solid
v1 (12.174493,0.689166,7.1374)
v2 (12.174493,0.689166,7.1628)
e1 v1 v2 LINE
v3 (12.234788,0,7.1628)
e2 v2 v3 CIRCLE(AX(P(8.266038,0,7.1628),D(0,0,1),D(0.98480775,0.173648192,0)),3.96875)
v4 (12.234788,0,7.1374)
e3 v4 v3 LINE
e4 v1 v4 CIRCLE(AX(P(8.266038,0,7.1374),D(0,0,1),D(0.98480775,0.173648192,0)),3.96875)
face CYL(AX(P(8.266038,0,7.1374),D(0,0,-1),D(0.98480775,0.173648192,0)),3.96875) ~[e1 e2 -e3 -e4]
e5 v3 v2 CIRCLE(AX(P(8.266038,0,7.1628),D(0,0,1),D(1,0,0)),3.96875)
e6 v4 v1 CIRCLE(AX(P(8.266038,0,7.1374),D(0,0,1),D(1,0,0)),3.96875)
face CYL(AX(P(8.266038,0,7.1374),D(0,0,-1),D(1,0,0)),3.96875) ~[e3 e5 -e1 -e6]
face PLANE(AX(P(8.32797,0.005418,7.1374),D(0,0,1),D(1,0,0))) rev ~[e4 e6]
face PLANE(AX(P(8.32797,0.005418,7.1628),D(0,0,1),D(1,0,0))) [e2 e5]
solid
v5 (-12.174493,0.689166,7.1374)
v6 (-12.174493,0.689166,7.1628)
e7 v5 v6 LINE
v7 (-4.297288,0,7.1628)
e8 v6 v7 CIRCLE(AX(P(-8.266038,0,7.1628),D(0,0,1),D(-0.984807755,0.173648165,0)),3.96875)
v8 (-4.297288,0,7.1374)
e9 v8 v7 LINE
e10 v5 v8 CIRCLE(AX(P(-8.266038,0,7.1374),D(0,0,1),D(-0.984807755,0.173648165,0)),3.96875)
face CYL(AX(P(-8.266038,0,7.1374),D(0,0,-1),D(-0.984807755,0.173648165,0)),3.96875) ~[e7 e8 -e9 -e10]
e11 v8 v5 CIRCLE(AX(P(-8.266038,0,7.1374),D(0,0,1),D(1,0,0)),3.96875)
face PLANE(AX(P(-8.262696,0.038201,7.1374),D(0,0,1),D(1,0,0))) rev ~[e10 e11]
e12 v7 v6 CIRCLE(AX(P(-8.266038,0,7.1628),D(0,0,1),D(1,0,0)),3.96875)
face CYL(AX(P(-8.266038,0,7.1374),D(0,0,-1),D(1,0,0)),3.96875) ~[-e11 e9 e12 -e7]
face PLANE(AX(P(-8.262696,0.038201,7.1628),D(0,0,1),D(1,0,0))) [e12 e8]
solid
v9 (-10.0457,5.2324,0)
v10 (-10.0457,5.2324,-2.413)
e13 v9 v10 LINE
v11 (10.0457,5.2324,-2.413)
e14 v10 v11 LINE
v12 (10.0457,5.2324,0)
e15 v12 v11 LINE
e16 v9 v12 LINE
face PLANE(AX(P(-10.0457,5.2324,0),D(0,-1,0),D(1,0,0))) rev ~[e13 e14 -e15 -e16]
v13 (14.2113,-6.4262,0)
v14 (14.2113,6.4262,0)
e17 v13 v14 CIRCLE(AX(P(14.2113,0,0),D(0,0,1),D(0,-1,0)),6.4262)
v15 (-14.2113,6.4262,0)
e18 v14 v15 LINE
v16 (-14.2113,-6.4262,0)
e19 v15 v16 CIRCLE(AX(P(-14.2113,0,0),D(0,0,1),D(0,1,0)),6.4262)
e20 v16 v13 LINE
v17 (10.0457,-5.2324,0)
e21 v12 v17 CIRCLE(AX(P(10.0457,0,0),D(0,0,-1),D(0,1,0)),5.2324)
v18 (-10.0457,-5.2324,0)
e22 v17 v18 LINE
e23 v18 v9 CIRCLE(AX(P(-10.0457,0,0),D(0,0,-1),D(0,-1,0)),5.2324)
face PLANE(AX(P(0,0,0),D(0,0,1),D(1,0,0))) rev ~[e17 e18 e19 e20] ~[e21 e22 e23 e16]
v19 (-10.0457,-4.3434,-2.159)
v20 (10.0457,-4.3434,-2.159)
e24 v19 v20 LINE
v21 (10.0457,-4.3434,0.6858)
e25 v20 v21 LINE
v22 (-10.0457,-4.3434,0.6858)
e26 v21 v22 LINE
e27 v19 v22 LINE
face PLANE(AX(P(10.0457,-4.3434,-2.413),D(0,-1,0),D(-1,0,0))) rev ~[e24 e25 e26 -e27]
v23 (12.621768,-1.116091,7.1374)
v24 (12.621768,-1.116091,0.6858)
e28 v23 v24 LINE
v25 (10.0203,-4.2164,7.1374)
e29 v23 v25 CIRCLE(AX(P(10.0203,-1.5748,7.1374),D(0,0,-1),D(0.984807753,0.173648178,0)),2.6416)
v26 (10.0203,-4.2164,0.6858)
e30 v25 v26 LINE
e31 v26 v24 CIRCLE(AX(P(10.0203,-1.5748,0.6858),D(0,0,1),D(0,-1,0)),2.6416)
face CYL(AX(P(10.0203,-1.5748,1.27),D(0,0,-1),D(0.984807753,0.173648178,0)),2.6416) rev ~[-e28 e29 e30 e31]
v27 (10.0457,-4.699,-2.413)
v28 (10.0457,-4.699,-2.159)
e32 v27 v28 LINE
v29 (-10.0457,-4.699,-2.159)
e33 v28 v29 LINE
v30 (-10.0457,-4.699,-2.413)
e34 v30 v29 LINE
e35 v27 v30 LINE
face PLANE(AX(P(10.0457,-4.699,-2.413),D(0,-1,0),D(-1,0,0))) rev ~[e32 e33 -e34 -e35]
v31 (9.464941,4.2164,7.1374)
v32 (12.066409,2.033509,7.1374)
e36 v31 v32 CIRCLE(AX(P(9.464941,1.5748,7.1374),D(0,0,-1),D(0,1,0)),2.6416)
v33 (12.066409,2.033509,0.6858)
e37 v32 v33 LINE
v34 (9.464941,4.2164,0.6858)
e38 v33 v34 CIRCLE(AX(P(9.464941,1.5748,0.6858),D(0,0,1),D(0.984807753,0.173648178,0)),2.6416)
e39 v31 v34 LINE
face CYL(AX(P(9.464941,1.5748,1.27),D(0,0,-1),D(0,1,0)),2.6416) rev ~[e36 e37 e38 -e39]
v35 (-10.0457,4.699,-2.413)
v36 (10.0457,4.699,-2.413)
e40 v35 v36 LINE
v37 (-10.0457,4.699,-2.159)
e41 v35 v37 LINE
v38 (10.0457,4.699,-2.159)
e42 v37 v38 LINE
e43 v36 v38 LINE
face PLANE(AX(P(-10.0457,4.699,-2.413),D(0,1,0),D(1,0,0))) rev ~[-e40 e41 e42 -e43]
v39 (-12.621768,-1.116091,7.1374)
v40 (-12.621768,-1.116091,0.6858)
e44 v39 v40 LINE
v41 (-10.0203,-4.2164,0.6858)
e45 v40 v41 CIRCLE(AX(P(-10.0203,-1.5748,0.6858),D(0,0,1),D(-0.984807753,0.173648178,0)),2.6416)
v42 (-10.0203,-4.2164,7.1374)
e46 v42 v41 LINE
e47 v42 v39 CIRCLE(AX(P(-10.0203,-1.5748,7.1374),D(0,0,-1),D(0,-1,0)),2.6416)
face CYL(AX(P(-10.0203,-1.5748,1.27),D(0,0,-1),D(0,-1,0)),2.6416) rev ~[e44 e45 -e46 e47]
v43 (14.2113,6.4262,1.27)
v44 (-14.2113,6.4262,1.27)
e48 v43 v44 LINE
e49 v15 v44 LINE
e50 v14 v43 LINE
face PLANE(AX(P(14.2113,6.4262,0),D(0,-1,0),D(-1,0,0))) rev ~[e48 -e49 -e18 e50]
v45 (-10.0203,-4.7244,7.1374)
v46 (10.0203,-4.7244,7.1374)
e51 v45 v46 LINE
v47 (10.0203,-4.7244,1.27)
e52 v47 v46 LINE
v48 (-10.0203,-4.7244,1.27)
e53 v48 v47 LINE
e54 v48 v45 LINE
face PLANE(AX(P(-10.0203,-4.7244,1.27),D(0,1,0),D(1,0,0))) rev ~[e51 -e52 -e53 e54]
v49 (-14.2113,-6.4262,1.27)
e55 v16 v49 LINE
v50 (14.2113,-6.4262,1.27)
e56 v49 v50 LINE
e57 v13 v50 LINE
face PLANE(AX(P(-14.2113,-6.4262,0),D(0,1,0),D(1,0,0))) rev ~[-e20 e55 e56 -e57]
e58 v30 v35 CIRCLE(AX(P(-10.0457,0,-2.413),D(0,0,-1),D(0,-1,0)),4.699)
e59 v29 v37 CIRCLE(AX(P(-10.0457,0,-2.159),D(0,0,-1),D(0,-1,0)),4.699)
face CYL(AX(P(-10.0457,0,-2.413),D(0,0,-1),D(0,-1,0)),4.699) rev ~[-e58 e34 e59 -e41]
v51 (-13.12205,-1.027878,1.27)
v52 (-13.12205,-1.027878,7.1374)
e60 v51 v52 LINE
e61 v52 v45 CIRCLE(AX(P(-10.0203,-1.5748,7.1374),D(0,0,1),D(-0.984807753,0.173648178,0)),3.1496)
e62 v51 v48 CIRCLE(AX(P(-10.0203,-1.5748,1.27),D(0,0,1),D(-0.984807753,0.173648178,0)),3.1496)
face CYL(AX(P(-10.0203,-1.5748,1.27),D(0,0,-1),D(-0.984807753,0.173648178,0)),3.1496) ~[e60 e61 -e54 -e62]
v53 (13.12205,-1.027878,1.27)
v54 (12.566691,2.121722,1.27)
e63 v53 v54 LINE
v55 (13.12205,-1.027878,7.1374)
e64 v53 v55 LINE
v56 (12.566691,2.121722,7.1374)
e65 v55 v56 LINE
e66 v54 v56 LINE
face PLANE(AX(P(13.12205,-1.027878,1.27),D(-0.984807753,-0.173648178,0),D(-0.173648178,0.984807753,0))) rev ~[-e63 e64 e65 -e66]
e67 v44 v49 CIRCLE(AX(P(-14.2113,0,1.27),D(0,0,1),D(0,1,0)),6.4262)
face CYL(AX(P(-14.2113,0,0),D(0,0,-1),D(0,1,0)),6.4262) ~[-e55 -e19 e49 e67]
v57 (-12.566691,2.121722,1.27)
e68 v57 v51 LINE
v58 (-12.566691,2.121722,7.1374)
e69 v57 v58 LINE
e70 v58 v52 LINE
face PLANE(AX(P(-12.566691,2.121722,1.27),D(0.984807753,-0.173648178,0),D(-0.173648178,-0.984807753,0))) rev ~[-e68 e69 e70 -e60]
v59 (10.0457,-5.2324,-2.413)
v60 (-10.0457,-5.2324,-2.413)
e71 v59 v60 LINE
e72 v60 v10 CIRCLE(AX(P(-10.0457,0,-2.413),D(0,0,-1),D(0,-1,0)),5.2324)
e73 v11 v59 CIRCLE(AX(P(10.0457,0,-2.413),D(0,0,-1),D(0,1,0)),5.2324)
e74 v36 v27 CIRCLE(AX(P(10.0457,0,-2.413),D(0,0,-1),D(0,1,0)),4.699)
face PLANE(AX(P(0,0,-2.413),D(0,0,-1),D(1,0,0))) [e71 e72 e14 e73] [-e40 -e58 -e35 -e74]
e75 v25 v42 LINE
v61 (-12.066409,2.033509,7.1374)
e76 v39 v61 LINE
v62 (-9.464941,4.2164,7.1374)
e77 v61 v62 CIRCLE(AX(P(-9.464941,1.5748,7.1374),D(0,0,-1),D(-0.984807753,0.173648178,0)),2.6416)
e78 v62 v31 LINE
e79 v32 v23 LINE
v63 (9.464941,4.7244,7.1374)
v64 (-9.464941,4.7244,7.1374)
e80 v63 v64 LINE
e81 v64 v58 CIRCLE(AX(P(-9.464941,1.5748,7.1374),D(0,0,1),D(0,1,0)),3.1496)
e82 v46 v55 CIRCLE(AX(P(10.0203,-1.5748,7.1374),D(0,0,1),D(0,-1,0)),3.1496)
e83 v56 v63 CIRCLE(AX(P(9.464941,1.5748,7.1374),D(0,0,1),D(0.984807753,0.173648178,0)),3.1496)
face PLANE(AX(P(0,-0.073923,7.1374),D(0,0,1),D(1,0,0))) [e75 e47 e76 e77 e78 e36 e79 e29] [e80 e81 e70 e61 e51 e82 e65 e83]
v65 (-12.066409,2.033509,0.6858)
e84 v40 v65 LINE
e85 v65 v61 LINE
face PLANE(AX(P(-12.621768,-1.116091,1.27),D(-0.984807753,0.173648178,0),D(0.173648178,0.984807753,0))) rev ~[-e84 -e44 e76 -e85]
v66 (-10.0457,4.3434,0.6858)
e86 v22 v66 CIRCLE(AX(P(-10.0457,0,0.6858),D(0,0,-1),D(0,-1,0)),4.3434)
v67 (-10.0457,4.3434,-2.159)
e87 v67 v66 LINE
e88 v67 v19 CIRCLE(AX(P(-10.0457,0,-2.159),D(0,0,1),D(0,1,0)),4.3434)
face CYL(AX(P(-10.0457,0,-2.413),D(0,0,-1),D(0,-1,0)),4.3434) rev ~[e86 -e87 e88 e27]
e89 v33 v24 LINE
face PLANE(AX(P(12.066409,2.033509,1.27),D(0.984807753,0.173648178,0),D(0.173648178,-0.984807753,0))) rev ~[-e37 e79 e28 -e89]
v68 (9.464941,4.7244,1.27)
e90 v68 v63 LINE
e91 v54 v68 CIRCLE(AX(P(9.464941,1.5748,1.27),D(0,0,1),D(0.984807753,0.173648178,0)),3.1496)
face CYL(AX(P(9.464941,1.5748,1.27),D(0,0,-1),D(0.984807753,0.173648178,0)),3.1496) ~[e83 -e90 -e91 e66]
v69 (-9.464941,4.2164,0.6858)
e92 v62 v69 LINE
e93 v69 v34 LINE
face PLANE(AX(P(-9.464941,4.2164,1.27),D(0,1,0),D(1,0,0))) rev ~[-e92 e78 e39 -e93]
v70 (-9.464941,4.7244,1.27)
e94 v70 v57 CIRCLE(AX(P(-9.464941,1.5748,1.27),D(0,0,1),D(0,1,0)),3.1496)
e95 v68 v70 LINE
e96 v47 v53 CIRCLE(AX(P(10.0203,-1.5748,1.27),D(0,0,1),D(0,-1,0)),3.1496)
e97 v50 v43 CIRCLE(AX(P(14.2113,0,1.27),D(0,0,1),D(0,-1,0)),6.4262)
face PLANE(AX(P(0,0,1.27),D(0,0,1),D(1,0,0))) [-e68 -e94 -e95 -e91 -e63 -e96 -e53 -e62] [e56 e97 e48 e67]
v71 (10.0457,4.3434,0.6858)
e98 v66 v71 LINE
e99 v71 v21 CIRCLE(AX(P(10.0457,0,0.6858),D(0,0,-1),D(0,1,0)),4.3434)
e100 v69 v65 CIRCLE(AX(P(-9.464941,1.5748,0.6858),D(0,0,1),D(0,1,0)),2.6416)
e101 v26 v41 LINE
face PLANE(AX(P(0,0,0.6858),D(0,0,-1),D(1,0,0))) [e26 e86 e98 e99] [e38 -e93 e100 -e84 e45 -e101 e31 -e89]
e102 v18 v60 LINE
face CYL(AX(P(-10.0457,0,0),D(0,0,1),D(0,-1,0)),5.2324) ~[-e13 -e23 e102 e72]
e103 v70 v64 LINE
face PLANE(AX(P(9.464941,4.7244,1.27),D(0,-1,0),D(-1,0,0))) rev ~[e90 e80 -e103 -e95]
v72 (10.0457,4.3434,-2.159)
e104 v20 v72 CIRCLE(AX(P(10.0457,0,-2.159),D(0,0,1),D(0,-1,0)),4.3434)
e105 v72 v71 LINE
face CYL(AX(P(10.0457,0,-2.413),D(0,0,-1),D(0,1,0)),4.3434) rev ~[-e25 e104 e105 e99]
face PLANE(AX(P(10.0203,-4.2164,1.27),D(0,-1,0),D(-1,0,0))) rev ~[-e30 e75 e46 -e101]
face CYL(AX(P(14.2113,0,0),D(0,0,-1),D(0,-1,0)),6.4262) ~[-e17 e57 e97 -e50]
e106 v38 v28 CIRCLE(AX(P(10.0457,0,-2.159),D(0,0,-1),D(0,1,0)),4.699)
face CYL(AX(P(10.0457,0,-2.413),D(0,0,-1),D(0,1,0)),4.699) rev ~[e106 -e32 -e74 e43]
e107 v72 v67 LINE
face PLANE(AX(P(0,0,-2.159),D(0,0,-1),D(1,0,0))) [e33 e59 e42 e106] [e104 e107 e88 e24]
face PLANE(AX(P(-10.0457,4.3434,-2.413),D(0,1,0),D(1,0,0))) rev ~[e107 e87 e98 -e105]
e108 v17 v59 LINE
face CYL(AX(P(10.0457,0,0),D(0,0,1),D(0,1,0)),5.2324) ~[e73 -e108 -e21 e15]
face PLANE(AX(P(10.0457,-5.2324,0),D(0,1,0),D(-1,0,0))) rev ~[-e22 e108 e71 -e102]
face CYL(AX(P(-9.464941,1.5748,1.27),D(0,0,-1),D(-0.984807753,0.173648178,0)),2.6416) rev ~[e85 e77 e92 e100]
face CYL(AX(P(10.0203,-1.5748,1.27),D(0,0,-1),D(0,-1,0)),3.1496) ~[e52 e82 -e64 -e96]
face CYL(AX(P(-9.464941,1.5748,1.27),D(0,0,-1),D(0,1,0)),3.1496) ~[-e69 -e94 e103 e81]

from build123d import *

# Parameters (mm, degrees)
F1_DEPTH      = 1.27
F3_DEPTH      = 2.413
F5_DEPTH      = 3.0988
F6_DEPTH      = 0.254
F8_DEPTH      = 3.684
F8_DEPTH_BACK = 5.8674
F9_DEPTH      = 5.8674
F11_DEPTH     = 0.0254


# Not quite as in the source:
# - an extrude ends at something that could not be found from the text; its depth is read off the source's solid


with BuildPart() as f1:
    # F0 (on Top) → F1 (new body)
    with BuildSketch(Plane.XY):
        with BuildLine():
            ThreePointArc((-14.2113, 6.4262), (-20.6375, 0), (-14.2113, -6.4262))
            Line((-14.2113, -6.4262), (14.2113, -6.4262))
            ThreePointArc((14.2113, -6.4262), (20.6375, 0), (14.2113, 6.4262))
            Line((14.2113, 6.4262), (-14.2113, 6.4262))
        make_face()
    extrude(amount=F1_DEPTH)

    # F2 (on face) → F3 (join)
    with BuildSketch(Plane(origin=(0, 0, 0), x_dir=(1, 0, 0), z_dir=(0, 0, -1))):
        with BuildLine():
            ThreePointArc((-10.0457, 5.2324), (-15.2781, 0), (-10.0457, -5.2324))
            Line((-10.0457, -5.2324), (10.0457, -5.2324))
            ThreePointArc((10.0457, -5.2324), (15.2781, 0), (10.0457, 5.2324))
            Line((10.0457, 5.2324), (-10.0457, 5.2324))
        make_face()
    extrude(amount=F3_DEPTH)

    # F4 (on face) → F5 (cut)
    with BuildSketch(Plane(origin=(0, 0, -2.413), x_dir=(1, 0, 0), z_dir=(0, 0, -1))):
        with BuildLine():
            ThreePointArc((10.0457, -4.3434), (14.3891, 0), (10.0457, 4.3434))
            Line((10.0457, 4.3434), (-10.0457, 4.3434))
            ThreePointArc((-10.0457, 4.3434), (-14.3891, 0), (-10.0457, -4.3434))
            Line((-10.0457, -4.3434), (10.0457, -4.3434))
        make_face()
    extrude(amount=-F5_DEPTH, mode=Mode.SUBTRACT)

    # F4 (on face) → F6 (cut)
    with BuildSketch(Plane(origin=(0, 0, -2.413), x_dir=(1, 0, 0), z_dir=(0, 0, -1))):
        with BuildLine():
            ThreePointArc((10.0457, -4.699), (14.7447, 0), (10.0457, 4.699))
            Line((10.0457, 4.699), (-10.0457, 4.699))
            ThreePointArc((-10.0457, 4.699), (-14.7447, 0), (-10.0457, -4.699))
            Line((-10.0457, -4.699), (10.0457, -4.699))
        make_face()
        with BuildLine():
            Line((-10.0457, 4.3434), (10.0457, 4.3434))
            ThreePointArc((10.0457, 4.3434), (14.3891, 0), (10.0457, -4.3434))
            Line((10.0457, -4.3434), (-10.0457, -4.3434))
            ThreePointArc((-10.0457, -4.3434), (-14.3891, 0), (-10.0457, 4.3434))
        make_face(mode=Mode.SUBTRACT)
    extrude(amount=-F6_DEPTH, mode=Mode.SUBTRACT)

    # F7 (on face) → F8 (cut, two sides)
    with BuildSketch(Plane.XY.offset(1.27)) as f8_sk:
        with BuildLine():
            Line((9.4649405416, 4.2164), (-9.4649405416, 4.2164))
            ThreePointArc((-9.4649405416, 4.2164), (-11.1629282913, 3.5983830009), (-12.0664087019, 2.0335090261))
            Line((-12.0664087019, 2.0335090261), (-12.6217681604, -1.1160909739))
            ThreePointArc((-12.6217681604, -1.1160909739), (-12.0438830009, -3.2727877497), (-10.0203, -4.2164))
            Line((-10.0203, -4.2164), (10.0203, -4.2164))
            ThreePointArc((10.0203, -4.2164), (12.0438830009, -3.2727877497), (12.6217681604, -1.1160909739))
            Line((12.6217681604, -1.1160909739), (12.0664087019, 2.0335090261))
            ThreePointArc((12.0664087019, 2.0335090261), (11.1629282913, 3.5983830009), (9.4649405416, 4.2164))
        make_face()
    extrude(amount=-F8_DEPTH, mode=Mode.SUBTRACT)
    extrude(f8_sk.sketch, amount=F8_DEPTH_BACK, mode=Mode.SUBTRACT)

    # F7 (on face) → F9 (join)
    with BuildSketch(Plane.XY.offset(1.27)):
        with BuildLine():
            Line((9.4649405416, 4.7244), (-9.4649405416, 4.7244))
            ThreePointArc((-9.4649405416, 4.7244), (-11.489464397, 3.987533578), (-12.5666910404, 2.1217223004))
            Line((-12.5666910404, 2.1217223004), (-13.1220504989, -1.0278776996))
            ThreePointArc((-13.1220504989, -1.0278776996), (-12.433033578, -3.5993238555), (-10.0203, -4.7244))
            Line((-10.0203, -4.7244), (10.0203, -4.7244))
            ThreePointArc((10.0203, -4.7244), (12.433033578, -3.5993238555), (13.1220504989, -1.0278776996))
            Line((13.1220504989, -1.0278776996), (12.5666910404, 2.1217223004))
            ThreePointArc((12.5666910404, 2.1217223004), (11.489464397, 3.987533578), (9.4649405416, 4.7244))
        make_face()
        with BuildLine():
            ThreePointArc((-12.0664087019, 2.0335090261), (-11.1629282913, 3.5983830009), (-9.4649405416, 4.2164))
            Line((-9.4649405416, 4.2164), (9.4649405416, 4.2164))
            ThreePointArc((9.4649405416, 4.2164), (11.1629282913, 3.5983830009), (12.0664087019, 2.0335090261))
            Line((12.0664087019, 2.0335090261), (12.6217681604, -1.1160909739))
            ThreePointArc((12.6217681604, -1.1160909739), (12.0438830009, -3.2727877497), (10.0203, -4.2164))
            Line((10.0203, -4.2164), (-10.0203, -4.2164))
            ThreePointArc((-10.0203, -4.2164), (-12.0438830009, -3.2727877497), (-12.6217681604, -1.1160909739))
            Line((-12.6217681604, -1.1160909739), (-12.0664087019, 2.0335090261))
        make_face(mode=Mode.SUBTRACT)
    extrude(amount=F9_DEPTH)


with BuildPart() as f11:
    # F10 (on face) → F11 (new body)
    with BuildSketch(Plane.XY.offset(7.1374)):
        with BuildLine():
            ThreePointArc((-4.2972876631, 0), (-7.9201383338, 3.9536477102), (-12.1744934415, 0.6891661563))
            ThreePointArc((-12.1744934415, 0.6891661563), (-8.6119369925, -3.9536477102), (-4.2972876631, 0))
        make_face()
    extrude(amount=F11_DEPTH)


with BuildPart() as f11b:
    # F10 (on face) → F11, piece 2 (new body)
    with BuildSketch(Plane.XY.offset(7.1374)):
        with BuildLine():
            ThreePointArc((12.2347876631, 0), (12.2196853686, 0.3458993835), (12.1744934226, 0.6891662634))
            ThreePointArc((12.1744934226, 0.6891662634), (4.3123899576, -0.3458993835), (12.2347876631, 0))
        make_face()
    extrude(amount=F11_DEPTH)


solid = Compound([f1.part, f11.part, f11b.part])
